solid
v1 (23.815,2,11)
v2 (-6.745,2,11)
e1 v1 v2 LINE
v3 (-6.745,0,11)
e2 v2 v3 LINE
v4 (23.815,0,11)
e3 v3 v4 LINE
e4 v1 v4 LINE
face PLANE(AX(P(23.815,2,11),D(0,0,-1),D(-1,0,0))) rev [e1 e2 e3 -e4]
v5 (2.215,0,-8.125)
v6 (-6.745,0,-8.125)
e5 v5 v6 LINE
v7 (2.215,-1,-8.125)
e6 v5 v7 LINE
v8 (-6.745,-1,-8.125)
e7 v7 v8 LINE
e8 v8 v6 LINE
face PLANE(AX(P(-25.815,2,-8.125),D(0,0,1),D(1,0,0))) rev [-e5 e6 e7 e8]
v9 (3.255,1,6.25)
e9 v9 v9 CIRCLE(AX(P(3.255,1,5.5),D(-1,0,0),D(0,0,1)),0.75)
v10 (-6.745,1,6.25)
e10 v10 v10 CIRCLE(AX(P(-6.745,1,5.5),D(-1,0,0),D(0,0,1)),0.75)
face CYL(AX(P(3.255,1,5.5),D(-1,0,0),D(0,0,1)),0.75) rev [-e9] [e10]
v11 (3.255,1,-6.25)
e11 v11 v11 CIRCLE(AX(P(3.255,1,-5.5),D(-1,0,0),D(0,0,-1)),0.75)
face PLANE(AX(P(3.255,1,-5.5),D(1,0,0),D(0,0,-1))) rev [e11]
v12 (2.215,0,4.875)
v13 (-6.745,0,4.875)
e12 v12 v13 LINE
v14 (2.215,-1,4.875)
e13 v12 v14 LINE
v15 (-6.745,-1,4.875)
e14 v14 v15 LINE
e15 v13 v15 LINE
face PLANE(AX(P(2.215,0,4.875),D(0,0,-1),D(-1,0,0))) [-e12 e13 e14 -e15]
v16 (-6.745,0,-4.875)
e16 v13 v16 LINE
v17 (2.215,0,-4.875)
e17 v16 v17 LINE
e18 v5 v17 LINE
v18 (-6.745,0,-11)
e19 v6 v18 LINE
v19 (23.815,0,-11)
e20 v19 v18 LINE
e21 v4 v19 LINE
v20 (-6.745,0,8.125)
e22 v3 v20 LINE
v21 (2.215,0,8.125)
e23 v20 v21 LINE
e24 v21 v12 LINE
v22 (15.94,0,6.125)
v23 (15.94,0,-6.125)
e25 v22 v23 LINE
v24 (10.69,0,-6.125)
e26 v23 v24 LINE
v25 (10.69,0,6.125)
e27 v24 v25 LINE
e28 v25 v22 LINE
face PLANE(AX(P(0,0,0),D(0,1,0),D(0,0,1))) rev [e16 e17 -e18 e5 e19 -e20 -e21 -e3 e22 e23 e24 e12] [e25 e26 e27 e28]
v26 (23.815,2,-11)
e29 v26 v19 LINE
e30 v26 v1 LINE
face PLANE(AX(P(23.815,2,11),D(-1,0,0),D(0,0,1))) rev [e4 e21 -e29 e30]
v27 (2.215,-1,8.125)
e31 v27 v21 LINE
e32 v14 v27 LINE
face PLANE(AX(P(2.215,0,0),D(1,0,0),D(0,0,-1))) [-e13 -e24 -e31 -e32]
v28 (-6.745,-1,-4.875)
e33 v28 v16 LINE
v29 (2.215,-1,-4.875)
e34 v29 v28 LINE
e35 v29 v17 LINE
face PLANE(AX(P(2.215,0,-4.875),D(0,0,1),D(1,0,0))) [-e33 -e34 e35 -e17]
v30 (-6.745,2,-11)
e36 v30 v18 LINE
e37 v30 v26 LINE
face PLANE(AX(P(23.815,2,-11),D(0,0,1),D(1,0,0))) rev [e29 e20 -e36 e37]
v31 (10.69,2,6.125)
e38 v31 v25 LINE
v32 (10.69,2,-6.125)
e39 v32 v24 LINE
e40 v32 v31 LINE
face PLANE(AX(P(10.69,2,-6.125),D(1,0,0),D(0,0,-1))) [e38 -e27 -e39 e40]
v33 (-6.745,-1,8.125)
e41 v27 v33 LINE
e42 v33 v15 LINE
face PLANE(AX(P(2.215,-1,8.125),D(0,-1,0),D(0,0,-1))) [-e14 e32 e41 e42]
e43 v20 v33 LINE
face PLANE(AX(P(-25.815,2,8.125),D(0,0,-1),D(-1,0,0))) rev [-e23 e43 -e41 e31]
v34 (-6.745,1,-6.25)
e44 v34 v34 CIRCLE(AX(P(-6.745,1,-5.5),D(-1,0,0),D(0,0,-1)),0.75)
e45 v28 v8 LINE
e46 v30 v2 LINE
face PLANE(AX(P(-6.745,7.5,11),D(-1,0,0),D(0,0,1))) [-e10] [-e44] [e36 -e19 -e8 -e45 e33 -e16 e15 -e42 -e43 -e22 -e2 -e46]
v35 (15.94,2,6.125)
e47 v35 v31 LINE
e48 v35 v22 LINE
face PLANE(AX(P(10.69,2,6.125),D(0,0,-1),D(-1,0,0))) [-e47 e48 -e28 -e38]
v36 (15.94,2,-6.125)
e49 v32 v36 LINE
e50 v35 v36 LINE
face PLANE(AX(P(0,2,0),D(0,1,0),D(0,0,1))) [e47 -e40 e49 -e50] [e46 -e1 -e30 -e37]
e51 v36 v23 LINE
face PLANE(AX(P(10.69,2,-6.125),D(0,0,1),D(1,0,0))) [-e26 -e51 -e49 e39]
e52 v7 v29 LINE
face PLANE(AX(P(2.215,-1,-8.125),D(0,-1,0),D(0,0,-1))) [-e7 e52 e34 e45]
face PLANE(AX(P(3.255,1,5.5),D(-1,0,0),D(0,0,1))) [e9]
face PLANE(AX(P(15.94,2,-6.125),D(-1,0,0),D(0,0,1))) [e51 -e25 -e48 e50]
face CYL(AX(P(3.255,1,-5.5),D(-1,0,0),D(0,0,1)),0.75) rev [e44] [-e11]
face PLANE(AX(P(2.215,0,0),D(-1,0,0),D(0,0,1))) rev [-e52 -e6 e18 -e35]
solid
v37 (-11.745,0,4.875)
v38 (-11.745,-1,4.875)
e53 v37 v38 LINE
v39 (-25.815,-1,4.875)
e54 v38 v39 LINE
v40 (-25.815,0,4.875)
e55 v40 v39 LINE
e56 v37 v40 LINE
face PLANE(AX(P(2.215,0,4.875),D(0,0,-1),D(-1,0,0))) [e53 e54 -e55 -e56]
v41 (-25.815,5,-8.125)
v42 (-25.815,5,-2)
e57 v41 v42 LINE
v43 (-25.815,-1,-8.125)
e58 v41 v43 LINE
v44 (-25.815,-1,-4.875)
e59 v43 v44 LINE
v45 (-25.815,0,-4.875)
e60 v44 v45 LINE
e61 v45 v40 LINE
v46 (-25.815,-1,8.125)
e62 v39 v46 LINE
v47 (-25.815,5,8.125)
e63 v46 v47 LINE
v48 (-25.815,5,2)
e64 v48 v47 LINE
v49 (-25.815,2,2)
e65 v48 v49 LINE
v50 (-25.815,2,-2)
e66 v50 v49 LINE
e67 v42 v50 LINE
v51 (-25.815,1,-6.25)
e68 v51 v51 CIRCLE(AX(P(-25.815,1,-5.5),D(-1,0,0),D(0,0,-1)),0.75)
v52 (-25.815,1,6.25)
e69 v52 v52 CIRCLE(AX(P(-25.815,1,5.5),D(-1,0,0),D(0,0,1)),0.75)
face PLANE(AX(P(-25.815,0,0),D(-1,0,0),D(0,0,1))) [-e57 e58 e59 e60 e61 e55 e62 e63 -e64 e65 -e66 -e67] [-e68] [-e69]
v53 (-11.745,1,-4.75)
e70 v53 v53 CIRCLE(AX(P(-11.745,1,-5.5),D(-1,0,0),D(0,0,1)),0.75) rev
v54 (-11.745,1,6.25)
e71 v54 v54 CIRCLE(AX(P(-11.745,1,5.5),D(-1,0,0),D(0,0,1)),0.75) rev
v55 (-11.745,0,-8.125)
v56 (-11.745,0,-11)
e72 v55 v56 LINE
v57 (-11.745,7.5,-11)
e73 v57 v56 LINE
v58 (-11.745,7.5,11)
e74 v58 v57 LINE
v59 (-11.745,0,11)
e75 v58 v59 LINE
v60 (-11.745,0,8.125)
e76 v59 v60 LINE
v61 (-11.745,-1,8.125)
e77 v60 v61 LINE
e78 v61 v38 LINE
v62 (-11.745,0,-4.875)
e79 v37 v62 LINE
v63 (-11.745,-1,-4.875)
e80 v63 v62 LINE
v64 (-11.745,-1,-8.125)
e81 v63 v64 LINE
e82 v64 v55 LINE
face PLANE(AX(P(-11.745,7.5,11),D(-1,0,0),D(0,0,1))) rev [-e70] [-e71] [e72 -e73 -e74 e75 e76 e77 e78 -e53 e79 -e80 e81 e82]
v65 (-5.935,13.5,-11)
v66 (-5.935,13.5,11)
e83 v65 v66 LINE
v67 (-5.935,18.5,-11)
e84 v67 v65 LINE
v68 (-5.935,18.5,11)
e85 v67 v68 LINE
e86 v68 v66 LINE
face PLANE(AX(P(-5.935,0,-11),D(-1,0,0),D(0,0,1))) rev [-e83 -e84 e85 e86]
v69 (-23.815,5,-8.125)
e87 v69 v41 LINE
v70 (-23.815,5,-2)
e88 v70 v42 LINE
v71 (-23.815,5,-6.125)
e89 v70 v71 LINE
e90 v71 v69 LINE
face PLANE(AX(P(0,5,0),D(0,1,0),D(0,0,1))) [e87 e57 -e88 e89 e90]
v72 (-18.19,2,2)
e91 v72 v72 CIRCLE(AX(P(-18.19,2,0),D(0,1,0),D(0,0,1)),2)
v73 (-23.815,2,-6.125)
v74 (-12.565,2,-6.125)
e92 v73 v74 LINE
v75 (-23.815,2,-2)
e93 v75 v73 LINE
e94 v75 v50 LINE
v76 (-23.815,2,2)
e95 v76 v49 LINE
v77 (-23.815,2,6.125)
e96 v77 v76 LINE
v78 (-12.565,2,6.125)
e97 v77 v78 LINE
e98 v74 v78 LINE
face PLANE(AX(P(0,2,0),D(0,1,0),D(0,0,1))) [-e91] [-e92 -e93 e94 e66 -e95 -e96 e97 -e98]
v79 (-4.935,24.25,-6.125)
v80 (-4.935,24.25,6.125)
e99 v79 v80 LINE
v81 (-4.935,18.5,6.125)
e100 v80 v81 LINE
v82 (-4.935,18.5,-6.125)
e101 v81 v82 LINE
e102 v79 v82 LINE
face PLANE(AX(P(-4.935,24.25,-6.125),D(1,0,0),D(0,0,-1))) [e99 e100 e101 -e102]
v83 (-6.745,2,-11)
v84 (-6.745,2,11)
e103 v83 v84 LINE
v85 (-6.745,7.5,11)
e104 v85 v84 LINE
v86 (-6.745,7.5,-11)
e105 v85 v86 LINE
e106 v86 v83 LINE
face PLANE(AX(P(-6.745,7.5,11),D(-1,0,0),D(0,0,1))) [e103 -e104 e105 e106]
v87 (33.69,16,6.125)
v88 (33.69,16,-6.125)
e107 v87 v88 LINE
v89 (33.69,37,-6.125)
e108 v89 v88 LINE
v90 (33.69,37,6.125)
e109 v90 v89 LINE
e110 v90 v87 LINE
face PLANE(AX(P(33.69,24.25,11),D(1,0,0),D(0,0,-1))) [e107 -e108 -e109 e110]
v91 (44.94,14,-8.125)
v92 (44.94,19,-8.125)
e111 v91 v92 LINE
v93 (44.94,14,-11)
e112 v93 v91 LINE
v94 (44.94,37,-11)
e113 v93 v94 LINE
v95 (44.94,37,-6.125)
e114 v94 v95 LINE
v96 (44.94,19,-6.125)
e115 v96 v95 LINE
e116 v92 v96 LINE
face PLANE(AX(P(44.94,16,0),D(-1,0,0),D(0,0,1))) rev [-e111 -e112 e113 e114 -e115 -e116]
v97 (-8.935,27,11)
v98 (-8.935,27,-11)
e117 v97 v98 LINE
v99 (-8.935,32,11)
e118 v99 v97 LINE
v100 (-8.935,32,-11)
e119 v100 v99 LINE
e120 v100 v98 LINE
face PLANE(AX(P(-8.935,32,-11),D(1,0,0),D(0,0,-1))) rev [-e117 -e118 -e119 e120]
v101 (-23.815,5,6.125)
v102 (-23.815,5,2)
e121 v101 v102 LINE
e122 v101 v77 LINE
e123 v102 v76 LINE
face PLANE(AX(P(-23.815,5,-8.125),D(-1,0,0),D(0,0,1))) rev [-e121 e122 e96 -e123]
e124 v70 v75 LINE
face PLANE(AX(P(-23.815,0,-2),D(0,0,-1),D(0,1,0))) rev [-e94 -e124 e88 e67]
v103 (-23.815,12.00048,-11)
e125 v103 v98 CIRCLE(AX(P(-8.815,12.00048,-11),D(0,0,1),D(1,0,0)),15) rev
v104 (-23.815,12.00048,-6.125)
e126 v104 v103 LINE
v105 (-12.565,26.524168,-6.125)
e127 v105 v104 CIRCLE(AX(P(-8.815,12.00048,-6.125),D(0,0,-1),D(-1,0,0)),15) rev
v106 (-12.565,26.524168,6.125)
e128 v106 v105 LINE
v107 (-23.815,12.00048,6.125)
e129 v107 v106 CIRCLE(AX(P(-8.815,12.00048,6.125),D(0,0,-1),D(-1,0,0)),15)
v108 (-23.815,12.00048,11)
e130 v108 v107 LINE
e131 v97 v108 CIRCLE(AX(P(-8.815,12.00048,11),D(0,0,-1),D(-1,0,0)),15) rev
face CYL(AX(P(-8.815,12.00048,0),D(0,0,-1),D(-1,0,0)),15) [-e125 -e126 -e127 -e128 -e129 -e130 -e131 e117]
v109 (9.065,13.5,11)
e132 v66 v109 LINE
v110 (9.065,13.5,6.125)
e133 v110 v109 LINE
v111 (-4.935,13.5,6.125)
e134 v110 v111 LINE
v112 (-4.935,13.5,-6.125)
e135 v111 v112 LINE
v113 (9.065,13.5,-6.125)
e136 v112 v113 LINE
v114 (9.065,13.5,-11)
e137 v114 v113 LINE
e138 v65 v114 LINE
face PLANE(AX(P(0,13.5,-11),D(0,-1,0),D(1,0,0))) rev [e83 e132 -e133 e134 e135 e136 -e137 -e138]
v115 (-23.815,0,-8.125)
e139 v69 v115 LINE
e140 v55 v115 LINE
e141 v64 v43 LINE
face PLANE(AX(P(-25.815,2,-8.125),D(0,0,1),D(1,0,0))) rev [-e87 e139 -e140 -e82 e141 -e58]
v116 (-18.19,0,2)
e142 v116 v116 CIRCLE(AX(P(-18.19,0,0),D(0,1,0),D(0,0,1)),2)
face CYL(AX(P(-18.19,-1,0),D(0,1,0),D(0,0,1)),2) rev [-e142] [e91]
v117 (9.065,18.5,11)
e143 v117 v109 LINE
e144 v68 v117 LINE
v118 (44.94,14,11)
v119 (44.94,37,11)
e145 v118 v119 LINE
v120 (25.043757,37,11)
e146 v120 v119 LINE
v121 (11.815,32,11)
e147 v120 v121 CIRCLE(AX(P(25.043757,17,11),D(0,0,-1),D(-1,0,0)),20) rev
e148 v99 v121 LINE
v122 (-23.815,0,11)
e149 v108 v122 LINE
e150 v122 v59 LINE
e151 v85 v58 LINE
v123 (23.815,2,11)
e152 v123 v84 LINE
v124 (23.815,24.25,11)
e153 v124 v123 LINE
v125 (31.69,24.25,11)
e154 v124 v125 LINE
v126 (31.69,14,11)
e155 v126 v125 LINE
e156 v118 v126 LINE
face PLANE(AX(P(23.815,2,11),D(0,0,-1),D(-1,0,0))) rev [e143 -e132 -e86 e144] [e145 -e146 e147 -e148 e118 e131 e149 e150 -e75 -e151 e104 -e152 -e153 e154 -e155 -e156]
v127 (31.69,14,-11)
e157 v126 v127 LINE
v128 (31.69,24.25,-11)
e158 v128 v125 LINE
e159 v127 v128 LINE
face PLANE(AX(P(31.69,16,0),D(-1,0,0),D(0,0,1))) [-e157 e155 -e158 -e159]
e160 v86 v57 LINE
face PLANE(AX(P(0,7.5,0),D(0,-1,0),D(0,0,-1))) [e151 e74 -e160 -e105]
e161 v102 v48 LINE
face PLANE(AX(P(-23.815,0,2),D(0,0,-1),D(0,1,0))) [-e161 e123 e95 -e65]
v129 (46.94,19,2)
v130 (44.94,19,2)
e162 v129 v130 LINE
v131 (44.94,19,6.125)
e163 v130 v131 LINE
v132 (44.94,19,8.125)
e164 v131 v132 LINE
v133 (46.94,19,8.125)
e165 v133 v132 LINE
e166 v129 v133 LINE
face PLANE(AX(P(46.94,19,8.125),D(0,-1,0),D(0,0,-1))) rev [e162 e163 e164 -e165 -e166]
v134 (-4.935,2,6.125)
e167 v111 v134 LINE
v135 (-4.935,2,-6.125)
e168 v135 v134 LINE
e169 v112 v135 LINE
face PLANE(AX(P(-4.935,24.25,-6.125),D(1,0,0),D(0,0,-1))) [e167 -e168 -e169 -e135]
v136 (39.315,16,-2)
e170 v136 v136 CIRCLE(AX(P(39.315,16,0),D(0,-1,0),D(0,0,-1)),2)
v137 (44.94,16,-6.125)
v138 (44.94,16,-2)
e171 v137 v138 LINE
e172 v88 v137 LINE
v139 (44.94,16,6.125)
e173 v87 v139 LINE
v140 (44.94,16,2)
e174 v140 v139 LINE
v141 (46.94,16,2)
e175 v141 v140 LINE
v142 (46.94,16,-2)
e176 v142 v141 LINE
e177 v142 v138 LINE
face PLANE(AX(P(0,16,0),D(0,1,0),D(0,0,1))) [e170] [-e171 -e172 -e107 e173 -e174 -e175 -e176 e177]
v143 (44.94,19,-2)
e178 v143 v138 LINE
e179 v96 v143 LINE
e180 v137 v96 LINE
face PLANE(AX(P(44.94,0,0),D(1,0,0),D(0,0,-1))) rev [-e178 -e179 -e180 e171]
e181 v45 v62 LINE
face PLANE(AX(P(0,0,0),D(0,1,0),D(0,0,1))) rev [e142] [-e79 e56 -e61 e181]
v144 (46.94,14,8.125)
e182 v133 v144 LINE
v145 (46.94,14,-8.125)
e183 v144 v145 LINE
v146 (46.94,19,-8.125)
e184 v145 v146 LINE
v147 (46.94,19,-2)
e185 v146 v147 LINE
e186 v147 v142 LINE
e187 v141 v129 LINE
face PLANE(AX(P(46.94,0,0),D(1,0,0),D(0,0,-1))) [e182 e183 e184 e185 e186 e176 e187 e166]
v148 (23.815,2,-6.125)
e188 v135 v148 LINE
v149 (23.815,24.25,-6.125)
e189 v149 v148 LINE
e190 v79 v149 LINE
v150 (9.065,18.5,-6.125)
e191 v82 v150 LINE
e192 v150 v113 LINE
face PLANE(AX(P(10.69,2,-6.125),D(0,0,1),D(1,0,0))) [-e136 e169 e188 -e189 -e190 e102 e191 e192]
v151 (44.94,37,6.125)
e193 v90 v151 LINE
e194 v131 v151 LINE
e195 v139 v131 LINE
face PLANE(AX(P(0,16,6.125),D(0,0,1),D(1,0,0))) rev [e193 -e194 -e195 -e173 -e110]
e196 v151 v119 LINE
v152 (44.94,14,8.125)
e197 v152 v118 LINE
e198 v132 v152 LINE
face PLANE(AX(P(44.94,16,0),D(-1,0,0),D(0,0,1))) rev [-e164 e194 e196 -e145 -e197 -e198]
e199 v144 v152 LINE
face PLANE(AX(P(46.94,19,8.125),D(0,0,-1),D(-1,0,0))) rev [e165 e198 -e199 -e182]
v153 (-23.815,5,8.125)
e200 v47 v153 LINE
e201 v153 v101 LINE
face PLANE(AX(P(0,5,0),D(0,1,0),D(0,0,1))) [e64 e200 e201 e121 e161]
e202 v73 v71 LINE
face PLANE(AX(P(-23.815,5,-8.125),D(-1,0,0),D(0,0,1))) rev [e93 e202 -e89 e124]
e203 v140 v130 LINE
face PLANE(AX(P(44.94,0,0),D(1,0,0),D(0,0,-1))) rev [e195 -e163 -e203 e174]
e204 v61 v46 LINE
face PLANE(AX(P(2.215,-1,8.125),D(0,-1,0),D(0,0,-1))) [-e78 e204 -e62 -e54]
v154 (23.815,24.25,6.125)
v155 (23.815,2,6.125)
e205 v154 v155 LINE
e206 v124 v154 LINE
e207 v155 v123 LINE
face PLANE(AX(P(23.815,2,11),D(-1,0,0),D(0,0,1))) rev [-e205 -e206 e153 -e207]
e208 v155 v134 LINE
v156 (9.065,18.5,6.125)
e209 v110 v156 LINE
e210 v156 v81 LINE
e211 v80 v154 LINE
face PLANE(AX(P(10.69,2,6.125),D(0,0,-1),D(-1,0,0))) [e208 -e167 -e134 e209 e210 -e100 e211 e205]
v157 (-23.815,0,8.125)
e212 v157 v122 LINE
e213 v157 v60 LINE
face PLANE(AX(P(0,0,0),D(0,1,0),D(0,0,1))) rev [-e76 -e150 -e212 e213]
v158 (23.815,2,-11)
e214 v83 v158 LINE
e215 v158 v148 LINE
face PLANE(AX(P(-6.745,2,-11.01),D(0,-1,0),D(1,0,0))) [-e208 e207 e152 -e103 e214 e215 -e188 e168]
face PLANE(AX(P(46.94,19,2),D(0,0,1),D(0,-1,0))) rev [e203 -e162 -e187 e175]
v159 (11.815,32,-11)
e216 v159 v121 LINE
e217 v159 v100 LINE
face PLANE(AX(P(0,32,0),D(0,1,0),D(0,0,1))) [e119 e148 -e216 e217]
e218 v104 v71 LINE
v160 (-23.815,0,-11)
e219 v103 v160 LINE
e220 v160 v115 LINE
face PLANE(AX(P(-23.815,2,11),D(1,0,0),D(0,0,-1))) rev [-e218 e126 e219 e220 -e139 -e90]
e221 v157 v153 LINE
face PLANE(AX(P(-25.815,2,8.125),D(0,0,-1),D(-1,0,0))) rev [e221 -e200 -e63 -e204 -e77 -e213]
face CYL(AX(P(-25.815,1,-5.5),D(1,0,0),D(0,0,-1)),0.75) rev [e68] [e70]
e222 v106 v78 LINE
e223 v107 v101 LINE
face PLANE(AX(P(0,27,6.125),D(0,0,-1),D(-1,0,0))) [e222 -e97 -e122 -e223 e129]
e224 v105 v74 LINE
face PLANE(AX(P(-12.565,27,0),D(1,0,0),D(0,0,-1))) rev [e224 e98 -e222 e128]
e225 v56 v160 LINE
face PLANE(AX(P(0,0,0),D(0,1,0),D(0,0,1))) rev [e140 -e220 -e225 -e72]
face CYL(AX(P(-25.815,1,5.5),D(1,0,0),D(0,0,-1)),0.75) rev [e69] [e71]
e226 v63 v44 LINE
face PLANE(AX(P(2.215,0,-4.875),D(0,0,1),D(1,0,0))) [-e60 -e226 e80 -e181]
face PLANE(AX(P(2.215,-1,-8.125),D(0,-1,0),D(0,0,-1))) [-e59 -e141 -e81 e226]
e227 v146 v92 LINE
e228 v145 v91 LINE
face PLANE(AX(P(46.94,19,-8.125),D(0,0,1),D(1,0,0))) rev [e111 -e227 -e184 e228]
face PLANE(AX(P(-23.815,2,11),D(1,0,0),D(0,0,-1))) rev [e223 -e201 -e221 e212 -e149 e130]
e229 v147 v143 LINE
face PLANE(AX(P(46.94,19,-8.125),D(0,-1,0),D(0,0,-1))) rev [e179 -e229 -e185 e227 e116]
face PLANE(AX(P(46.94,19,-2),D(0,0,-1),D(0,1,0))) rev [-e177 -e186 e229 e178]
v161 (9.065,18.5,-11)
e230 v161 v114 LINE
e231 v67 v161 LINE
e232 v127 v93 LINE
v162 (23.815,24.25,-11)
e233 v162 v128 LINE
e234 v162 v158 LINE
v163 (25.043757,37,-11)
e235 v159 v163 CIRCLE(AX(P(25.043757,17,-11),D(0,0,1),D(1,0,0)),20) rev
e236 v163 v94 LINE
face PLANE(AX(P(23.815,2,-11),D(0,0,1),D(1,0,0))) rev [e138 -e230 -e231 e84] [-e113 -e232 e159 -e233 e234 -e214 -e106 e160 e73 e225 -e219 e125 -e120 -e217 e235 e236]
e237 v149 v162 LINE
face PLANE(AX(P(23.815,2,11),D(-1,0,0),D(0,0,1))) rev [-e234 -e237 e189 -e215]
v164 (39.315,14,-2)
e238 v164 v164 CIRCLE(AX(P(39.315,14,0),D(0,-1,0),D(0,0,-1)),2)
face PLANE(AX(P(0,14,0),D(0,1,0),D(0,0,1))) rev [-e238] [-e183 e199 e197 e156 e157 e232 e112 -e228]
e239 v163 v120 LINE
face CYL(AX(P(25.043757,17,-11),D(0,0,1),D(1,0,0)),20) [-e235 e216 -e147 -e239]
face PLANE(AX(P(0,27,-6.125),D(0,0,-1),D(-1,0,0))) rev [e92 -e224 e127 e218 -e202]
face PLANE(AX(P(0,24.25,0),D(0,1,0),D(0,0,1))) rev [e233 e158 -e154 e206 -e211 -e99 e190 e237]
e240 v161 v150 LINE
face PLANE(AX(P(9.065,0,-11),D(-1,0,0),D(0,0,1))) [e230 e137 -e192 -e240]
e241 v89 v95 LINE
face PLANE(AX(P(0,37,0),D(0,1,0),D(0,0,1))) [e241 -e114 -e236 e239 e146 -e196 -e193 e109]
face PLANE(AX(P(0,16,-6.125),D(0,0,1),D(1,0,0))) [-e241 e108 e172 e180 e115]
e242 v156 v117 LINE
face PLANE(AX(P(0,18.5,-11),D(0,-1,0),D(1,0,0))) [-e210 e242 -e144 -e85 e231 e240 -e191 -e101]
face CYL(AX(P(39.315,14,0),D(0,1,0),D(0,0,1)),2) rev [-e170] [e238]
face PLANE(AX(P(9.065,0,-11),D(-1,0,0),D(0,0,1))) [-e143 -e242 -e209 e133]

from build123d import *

# Parameters (mm, degrees)
SKETCH1_W              = 47.63
SKETCH1_H              = 22
SKETCH1_W_2            = 5.25
SKETCH1_H_2            = 12.25
BOSS_EXTRUDE1_DEPTH    = 2
SKETCH3_W              = 32.75
SKETCH3_H              = 22
BOSS_EXTRUDE2_DEPTH    = 30
SKETCH2_W              = 28.75
SKETCH2_H              = 12.25
CUT_EXTRUDE1_DEPTH     = 22.25
BOSS_EXTRUDE7_DEPTH    = 25
SKETCH19_W             = 16.25
SKETCH19_H             = 2
BOSS_EXTRUDE8_DEPTH    = 2
SKETCH20_W             = 2
SKETCH20_H             = 16.25
BOSS_EXTRUDE9_DEPTH    = 3
SKETCH39_W             = 4
SKETCH39_H             = 3
CUT_EXTRUDE16_DEPTH    = 2
BOSS_EXTRUDE11_DEPTH   = 28.03
SKETCH10_W             = 5
SKETCH10_H             = 22
CUT_EXTRUDE6_DEPTH     = 7.5
SKETCH21_R             = 0.75
CUT_EXTRUDE12_DEPTH    = 10
SKETCH21_5_R           = 0.75
CUT_EXTRUDE13_DEPTH    = 46.595105
SKETCH10_3_W           = 5
SKETCH10_3_H           = 2.875
SKETCH10_3_H_2         = 3.25
SKETCH10_3_H_3         = 9.75
CUT_EXTRUDE14_DEPTH    = 43.560712224
SKETCH25_W             = 14
SKETCH25_H             = 5
SKETCH25_W_2           = 1
CUT_EXTRUDE15_DEPTH    = 47.630614675
FILLET2_R              = 15
SKETCH29_W             = 9.875
SKETCH29_H             = 22
BOSS_EXTRUDE12_DEPTH   = 7.75
SKETCH30_W             = 11.25
SKETCH30_H             = 4.875
BOSS_EXTRUDE13_DEPTH   = 16
SKETCH36_W             = 13.25
SKETCH36_H             = 22
SKETCH36_R             = 2
BOSS_EXTRUDE16_DEPTH   = 2
SKETCH30_4_W           = 11.25
SKETCH30_4_H           = 4.875
BOSS_EXTRUDE18_DEPTH   = 5
BOSS_EXTRUDE19_DEPTH   = 2
SKETCH29_3_W           = 9.875
SKETCH29_3_H           = 22
BOSS_EXTRUDE20_DEPTH   = 5
SKETCH40_W             = 12
SKETCH40_H             = 22
BOSS_EXTRUDE21_DEPTH   = 5
FILLET5_R              = 20
SPLIT2_SURFACE_1_BACK  = 85.978
SPLIT2_SURFACE_1_DEPTH = 171.956
SPLIT2_SURFACE_2_BACK  = 85.978
SPLIT2_SURFACE_2_DEPTH = 171.956
SKETCH45_R             = 2
CUT_EXTRUDE17_DEPTH    = 60.57653565


with BuildPart() as part:
    # Sketch1 → Boss-Extrude1 (new body)
    with BuildSketch(Plane(origin=(0, 0, 0), x_dir=(1, 0, 0), z_dir=(0, 1, 0))):
        Rectangle(SKETCH1_W, SKETCH1_H)
        with Locations((13.315, 0)):
            Rectangle(SKETCH1_W_2, SKETCH1_H_2, mode=Mode.SUBTRACT)
    extrude(amount=BOSS_EXTRUDE1_DEPTH)

    # Sketch3 → Boss-Extrude2 (add)
    with BuildSketch(Plane(origin=(0, 2, 0), x_dir=(1, 0, 0), z_dir=(0, 1, 0))):
        with Locations((7.44, 0)):
            Rectangle(SKETCH3_W, SKETCH3_H)
    extrude(amount=BOSS_EXTRUDE2_DEPTH)

    # Sketch2 → Cut-Extrude1 (cut)
    with BuildSketch(Plane(origin=(0, 2, 0), x_dir=(1, 0, 0), z_dir=(0, 1, 0))):
        with Locations((9.44, 0)):
            Rectangle(SKETCH2_W, SKETCH2_H)
    extrude(amount=CUT_EXTRUDE1_DEPTH, mode=Mode.SUBTRACT)

    # Sketch18 → Boss-Extrude7 (add)
    with BuildSketch(Plane(origin=(0, 2, 0), x_dir=(1, 0, 0), z_dir=(0, 1, 0))):
        Polygon((-23.815, 11), (-23.815, 6.125), (-12.565, 6.125), (-12.565, -6.125), (-23.815, -6.125), (-23.815, -11), (-8.935, -11), (-8.935, 11), align=None)
    extrude(amount=BOSS_EXTRUDE7_DEPTH)

    # Sketch19 → Boss-Extrude8 (add)
    with BuildSketch(Plane.ZY.offset(23.815)):
        with Locations((0, 1)):
            Rectangle(SKETCH19_W, SKETCH19_H)
    extrude(amount=BOSS_EXTRUDE8_DEPTH)

    # Sketch20 → Boss-Extrude9 (add)
    with BuildSketch(Plane(origin=(0, 2, 0), x_dir=(1, 0, 0), z_dir=(0, 1, 0))):
        with Locations((-24.815, 0)):
            Rectangle(SKETCH20_W, SKETCH20_H)
    extrude(amount=BOSS_EXTRUDE9_DEPTH)

    # Sketch39 → Cut-Extrude16 (cut)
    with BuildSketch(Plane.ZY.offset(25.815)):
        with Locations((0, 3.5)):
            Rectangle(SKETCH39_W, SKETCH39_H)
    extrude(amount=-CUT_EXTRUDE16_DEPTH, mode=Mode.SUBTRACT)

    # Sketch24 → Boss-Extrude11 (add)
    with BuildSketch(Plane.ZY.offset(25.815)):
        Polygon((-8.125, 0), (-8.125, -1), (-4.875, -1), (-4.875, 0), (-4.875, 0.25), (-8.125, 0.25), align=None)
        Polygon((8.125, 0), (8.125, 0.25), (4.875, 0.25), (4.875, 0), (4.875, -1), (8.125, -1), align=None)
    extrude(amount=-BOSS_EXTRUDE11_DEPTH)

    # Sketch10 → Cut-Extrude6 (cut)
    with BuildSketch(Plane.XZ):
        with Locations((-9.245, 0)):
            Rectangle(SKETCH10_W, SKETCH10_H)
    extrude(amount=-CUT_EXTRUDE6_DEPTH, mode=Mode.SUBTRACT)

    # Sketch21 → Cut-Extrude12 (cut)
    with BuildSketch(Plane.ZY.offset(6.745)):
        with Locations((5.5, 1)):
            Circle(SKETCH21_R)
        with Locations(Location((-5.5, 1, 0), (0, 0, 180))):
            Circle(SKETCH21_R)
    extrude(amount=-CUT_EXTRUDE12_DEPTH, mode=Mode.SUBTRACT)

    # Sketch21<5> → Cut-Extrude13 (cut, through all)
    with BuildSketch(Plane.ZY.offset(6.745)):
        with Locations((5.5, 1)):
            Circle(SKETCH21_5_R)
        with Locations(Location((-5.5, 1, 0), (0, 0, 180))):
            Circle(SKETCH21_5_R)
    extrude(amount=CUT_EXTRUDE13_DEPTH, mode=Mode.SUBTRACT)

    # Sketch10<3> → Cut-Extrude14 (cut, through all)
    with BuildSketch(Plane.XZ):
        with Locations((-9.245, -9.5625)):
            Rectangle(SKETCH10_3_W, SKETCH10_3_H)
        with Locations((-9.245, -6.5)):
            Rectangle(SKETCH10_3_W, SKETCH10_3_H_2)
        with Locations((-9.245, 0)):
            Rectangle(SKETCH10_3_W, SKETCH10_3_H_3)
        with Locations((-9.245, 6.5)):
            Rectangle(SKETCH10_3_W, SKETCH10_3_H_2)
        with Locations((-9.245, 9.5625)):
            Rectangle(SKETCH10_3_W, SKETCH10_3_H)
    extrude(amount=CUT_EXTRUDE14_DEPTH, mode=Mode.SUBTRACT)

    # Sketch25 → Cut-Extrude15 (cut, through all)
    with BuildSketch(Plane.XY.offset(11)):
        with Locations((2.065, 16)):
            Rectangle(SKETCH25_W, SKETCH25_H)
        with Locations((-5.435, 16)):
            Rectangle(SKETCH25_W_2, SKETCH25_H)
    extrude(amount=-CUT_EXTRUDE15_DEPTH, mode=Mode.SUBTRACT)

    # Fillet2
    # the kernel refuses this fillet: 15 mm, written as the material it takes off along each edge
    with BuildSketch(Plane(origin=(-23.815, 27, -31.375), x_dir=(1, 0, 0), z_dir=(0, 0, 1))) as fillet2_piece_1_section:
        with BuildLine():
            CenterArc((FILLET2_R, -FILLET2_R), FILLET2_R, 90, 90)
            Line((0, -FILLET2_R), (0, 0))
            Line((0, 0), (FILLET2_R, 0))
        make_face()
    fillet2_piece_1 = extrude(amount=79.875, mode=Mode.PRIVATE)
    fillet2_piece_1 = split(fillet2_piece_1, bisect_by=Plane(origin=(-8.935, 23.601845872, 8.5625), z_dir=(-1, 0, 0)), keep=Keep.TOP, mode=Mode.PRIVATE)
    add(fillet2_piece_1, mode=Mode.SUBTRACT)

    # Sketch29 → Boss-Extrude12 (add)
    with BuildSketch(Plane(origin=(0, 32, 0), x_dir=(1, 0, 0), z_dir=(0, 1, 0))):
        with Locations((28.7525, 0)):
            Rectangle(SKETCH29_W, SKETCH29_H)
    extrude(amount=-BOSS_EXTRUDE12_DEPTH)

    # Sketch30 → Boss-Extrude13 (add)
    with BuildSketch(Plane(origin=(0, 32, 0), x_dir=(1, 0, 0), z_dir=(0, 1, 0))):
        Polygon((33.69, 6.125), (33.69, 11), (31.69, 11), (31.69, -11), (33.69, -11), (33.69, -6.125), align=None)
        with Locations((39.315, 8.5625)):
            Rectangle(SKETCH30_W, SKETCH30_H)
        with Locations((39.315, -8.5625)):
            Rectangle(SKETCH30_W, SKETCH30_H)
    extrude(amount=-BOSS_EXTRUDE13_DEPTH)

    # Sketch36 → Boss-Extrude16 (add)
    with BuildSketch(Plane.XZ.offset(-16)):
        with Locations((38.315, 0)):
            Rectangle(SKETCH36_W, SKETCH36_H)
        with Locations(Location((39.315, 0, 0), (0, 0, 270))):
            Circle(SKETCH36_R, mode=Mode.SUBTRACT)
    extrude(amount=BOSS_EXTRUDE16_DEPTH)

    # Sketch30<4> → Boss-Extrude18 (add)
    with BuildSketch(Plane(origin=(0, 32, 0), x_dir=(1, 0, 0), z_dir=(0, 1, 0))):
        with Locations((39.315, 8.5625)):
            Rectangle(SKETCH30_4_W, SKETCH30_4_H)
        Polygon((33.69, 6.125), (33.69, 11), (31.69, 11), (31.69, -11), (33.69, -11), (33.69, -6.125), align=None)
        with Locations((39.315, -8.5625)):
            Rectangle(SKETCH30_4_W, SKETCH30_4_H)
    extrude(amount=BOSS_EXTRUDE18_DEPTH)

    # Sketch38 → Boss-Extrude19 (add)
    with BuildSketch(Plane(origin=(44.94, 0, 0), x_dir=(0, 0, -1), z_dir=(1, 0, 0))):
        Polygon((-8.125, 19), (-2, 19), (-2, 16), (2, 16), (2, 19), (8.125, 19), (8.125, 14), (-8.125, 14), align=None)
    extrude(amount=BOSS_EXTRUDE19_DEPTH)

    # Sketch29<3> → Boss-Extrude20 (add)
    with BuildSketch(Plane(origin=(0, 32, 0), x_dir=(1, 0, 0), z_dir=(0, 1, 0))):
        with Locations((28.7525, 0)):
            Rectangle(SKETCH29_3_W, SKETCH29_3_H)
    extrude(amount=BOSS_EXTRUDE20_DEPTH)

    # Sketch40 → Boss-Extrude21 (add)
    with BuildSketch(Plane(origin=(0, 32, 0), x_dir=(1, 0, 0), z_dir=(0, 1, 0))):
        with Locations((17.815, 0)):
            Rectangle(SKETCH40_W, SKETCH40_H)
    extrude(amount=BOSS_EXTRUDE21_DEPTH)

    # Fillet5
    # the kernel refuses this fillet: 20 mm, written as the material it takes off along each edge
    with BuildSketch(Plane(origin=(11.815, 37, -44.071891388), x_dir=(0, -1, 0), z_dir=(0, 0, 1))) as fillet5_piece_1:
        with BuildLine():
            CenterArc((20, 13.228756555), FILLET5_R, 180, 41.409622109)
            Line((0, 13.228756555), (-0.4, 13.228756555))
            Line((-0.4, 13.228756555), (-0.4, 0))
            Line((-0.4, 0), (0, -0.4))
            ThreePointArc((0, -0.4), (2.5, -0.4), (4.7, -0.264575131))
            Line((4.7, -0.264575131), (5, 0))
        make_face()
    extrude(amount=88.143782777, mode=Mode.SUBTRACT)


with BuildPart() as body_2:
    # Split2: the piece behind the surface
    add(part.part)
    # Split2 surface: a surface, the sketch's curves swept straight by 171.956 mm
    with BuildLine(Plane.XY.offset(11).offset(-SPLIT2_SURFACE_1_BACK), mode=Mode.PRIVATE) as split2_surface_1_path:
        Line((-6.745, 2), (23.815, 2))
    split2_surface_1 = Shell.extrude(split2_surface_1_path.wire(), (0 * SPLIT2_SURFACE_1_DEPTH, 0 * SPLIT2_SURFACE_1_DEPTH, 1 * SPLIT2_SURFACE_1_DEPTH))
    split(bisect_by=split2_surface_1, keep=Keep.BOTTOM)


with BuildPart() as part_1:
    add(part.part)

    # Split2: split by a surface, the side it looks to stays
    # Split2 surface: a surface, the sketch's curves swept straight by 171.956 mm
    with BuildLine(Plane.XY.offset(11).offset(-SPLIT2_SURFACE_2_BACK), mode=Mode.PRIVATE) as split2_surface_2_path:
        Line((-6.745, 2), (23.815, 2))
    split2_surface_2 = Shell.extrude(split2_surface_2_path.wire(), (0 * SPLIT2_SURFACE_2_DEPTH, 0 * SPLIT2_SURFACE_2_DEPTH, 1 * SPLIT2_SURFACE_2_DEPTH))
    split(bisect_by=split2_surface_2, keep=Keep.TOP)

    # Sketch45 → Cut-Extrude17 (cut, through all)
    with BuildSketch(Plane(origin=(0, 2, 0), x_dir=(1, 0, 0), z_dir=(0, 1, 0))):
        with Locations(Location((-18.19, 0, 0), (0, 0, 270))):
            Circle(SKETCH45_R)
    extrude(amount=-CUT_EXTRUDE17_DEPTH, mode=Mode.SUBTRACT)


solid = Compound([body_2.part, part_1.part])
